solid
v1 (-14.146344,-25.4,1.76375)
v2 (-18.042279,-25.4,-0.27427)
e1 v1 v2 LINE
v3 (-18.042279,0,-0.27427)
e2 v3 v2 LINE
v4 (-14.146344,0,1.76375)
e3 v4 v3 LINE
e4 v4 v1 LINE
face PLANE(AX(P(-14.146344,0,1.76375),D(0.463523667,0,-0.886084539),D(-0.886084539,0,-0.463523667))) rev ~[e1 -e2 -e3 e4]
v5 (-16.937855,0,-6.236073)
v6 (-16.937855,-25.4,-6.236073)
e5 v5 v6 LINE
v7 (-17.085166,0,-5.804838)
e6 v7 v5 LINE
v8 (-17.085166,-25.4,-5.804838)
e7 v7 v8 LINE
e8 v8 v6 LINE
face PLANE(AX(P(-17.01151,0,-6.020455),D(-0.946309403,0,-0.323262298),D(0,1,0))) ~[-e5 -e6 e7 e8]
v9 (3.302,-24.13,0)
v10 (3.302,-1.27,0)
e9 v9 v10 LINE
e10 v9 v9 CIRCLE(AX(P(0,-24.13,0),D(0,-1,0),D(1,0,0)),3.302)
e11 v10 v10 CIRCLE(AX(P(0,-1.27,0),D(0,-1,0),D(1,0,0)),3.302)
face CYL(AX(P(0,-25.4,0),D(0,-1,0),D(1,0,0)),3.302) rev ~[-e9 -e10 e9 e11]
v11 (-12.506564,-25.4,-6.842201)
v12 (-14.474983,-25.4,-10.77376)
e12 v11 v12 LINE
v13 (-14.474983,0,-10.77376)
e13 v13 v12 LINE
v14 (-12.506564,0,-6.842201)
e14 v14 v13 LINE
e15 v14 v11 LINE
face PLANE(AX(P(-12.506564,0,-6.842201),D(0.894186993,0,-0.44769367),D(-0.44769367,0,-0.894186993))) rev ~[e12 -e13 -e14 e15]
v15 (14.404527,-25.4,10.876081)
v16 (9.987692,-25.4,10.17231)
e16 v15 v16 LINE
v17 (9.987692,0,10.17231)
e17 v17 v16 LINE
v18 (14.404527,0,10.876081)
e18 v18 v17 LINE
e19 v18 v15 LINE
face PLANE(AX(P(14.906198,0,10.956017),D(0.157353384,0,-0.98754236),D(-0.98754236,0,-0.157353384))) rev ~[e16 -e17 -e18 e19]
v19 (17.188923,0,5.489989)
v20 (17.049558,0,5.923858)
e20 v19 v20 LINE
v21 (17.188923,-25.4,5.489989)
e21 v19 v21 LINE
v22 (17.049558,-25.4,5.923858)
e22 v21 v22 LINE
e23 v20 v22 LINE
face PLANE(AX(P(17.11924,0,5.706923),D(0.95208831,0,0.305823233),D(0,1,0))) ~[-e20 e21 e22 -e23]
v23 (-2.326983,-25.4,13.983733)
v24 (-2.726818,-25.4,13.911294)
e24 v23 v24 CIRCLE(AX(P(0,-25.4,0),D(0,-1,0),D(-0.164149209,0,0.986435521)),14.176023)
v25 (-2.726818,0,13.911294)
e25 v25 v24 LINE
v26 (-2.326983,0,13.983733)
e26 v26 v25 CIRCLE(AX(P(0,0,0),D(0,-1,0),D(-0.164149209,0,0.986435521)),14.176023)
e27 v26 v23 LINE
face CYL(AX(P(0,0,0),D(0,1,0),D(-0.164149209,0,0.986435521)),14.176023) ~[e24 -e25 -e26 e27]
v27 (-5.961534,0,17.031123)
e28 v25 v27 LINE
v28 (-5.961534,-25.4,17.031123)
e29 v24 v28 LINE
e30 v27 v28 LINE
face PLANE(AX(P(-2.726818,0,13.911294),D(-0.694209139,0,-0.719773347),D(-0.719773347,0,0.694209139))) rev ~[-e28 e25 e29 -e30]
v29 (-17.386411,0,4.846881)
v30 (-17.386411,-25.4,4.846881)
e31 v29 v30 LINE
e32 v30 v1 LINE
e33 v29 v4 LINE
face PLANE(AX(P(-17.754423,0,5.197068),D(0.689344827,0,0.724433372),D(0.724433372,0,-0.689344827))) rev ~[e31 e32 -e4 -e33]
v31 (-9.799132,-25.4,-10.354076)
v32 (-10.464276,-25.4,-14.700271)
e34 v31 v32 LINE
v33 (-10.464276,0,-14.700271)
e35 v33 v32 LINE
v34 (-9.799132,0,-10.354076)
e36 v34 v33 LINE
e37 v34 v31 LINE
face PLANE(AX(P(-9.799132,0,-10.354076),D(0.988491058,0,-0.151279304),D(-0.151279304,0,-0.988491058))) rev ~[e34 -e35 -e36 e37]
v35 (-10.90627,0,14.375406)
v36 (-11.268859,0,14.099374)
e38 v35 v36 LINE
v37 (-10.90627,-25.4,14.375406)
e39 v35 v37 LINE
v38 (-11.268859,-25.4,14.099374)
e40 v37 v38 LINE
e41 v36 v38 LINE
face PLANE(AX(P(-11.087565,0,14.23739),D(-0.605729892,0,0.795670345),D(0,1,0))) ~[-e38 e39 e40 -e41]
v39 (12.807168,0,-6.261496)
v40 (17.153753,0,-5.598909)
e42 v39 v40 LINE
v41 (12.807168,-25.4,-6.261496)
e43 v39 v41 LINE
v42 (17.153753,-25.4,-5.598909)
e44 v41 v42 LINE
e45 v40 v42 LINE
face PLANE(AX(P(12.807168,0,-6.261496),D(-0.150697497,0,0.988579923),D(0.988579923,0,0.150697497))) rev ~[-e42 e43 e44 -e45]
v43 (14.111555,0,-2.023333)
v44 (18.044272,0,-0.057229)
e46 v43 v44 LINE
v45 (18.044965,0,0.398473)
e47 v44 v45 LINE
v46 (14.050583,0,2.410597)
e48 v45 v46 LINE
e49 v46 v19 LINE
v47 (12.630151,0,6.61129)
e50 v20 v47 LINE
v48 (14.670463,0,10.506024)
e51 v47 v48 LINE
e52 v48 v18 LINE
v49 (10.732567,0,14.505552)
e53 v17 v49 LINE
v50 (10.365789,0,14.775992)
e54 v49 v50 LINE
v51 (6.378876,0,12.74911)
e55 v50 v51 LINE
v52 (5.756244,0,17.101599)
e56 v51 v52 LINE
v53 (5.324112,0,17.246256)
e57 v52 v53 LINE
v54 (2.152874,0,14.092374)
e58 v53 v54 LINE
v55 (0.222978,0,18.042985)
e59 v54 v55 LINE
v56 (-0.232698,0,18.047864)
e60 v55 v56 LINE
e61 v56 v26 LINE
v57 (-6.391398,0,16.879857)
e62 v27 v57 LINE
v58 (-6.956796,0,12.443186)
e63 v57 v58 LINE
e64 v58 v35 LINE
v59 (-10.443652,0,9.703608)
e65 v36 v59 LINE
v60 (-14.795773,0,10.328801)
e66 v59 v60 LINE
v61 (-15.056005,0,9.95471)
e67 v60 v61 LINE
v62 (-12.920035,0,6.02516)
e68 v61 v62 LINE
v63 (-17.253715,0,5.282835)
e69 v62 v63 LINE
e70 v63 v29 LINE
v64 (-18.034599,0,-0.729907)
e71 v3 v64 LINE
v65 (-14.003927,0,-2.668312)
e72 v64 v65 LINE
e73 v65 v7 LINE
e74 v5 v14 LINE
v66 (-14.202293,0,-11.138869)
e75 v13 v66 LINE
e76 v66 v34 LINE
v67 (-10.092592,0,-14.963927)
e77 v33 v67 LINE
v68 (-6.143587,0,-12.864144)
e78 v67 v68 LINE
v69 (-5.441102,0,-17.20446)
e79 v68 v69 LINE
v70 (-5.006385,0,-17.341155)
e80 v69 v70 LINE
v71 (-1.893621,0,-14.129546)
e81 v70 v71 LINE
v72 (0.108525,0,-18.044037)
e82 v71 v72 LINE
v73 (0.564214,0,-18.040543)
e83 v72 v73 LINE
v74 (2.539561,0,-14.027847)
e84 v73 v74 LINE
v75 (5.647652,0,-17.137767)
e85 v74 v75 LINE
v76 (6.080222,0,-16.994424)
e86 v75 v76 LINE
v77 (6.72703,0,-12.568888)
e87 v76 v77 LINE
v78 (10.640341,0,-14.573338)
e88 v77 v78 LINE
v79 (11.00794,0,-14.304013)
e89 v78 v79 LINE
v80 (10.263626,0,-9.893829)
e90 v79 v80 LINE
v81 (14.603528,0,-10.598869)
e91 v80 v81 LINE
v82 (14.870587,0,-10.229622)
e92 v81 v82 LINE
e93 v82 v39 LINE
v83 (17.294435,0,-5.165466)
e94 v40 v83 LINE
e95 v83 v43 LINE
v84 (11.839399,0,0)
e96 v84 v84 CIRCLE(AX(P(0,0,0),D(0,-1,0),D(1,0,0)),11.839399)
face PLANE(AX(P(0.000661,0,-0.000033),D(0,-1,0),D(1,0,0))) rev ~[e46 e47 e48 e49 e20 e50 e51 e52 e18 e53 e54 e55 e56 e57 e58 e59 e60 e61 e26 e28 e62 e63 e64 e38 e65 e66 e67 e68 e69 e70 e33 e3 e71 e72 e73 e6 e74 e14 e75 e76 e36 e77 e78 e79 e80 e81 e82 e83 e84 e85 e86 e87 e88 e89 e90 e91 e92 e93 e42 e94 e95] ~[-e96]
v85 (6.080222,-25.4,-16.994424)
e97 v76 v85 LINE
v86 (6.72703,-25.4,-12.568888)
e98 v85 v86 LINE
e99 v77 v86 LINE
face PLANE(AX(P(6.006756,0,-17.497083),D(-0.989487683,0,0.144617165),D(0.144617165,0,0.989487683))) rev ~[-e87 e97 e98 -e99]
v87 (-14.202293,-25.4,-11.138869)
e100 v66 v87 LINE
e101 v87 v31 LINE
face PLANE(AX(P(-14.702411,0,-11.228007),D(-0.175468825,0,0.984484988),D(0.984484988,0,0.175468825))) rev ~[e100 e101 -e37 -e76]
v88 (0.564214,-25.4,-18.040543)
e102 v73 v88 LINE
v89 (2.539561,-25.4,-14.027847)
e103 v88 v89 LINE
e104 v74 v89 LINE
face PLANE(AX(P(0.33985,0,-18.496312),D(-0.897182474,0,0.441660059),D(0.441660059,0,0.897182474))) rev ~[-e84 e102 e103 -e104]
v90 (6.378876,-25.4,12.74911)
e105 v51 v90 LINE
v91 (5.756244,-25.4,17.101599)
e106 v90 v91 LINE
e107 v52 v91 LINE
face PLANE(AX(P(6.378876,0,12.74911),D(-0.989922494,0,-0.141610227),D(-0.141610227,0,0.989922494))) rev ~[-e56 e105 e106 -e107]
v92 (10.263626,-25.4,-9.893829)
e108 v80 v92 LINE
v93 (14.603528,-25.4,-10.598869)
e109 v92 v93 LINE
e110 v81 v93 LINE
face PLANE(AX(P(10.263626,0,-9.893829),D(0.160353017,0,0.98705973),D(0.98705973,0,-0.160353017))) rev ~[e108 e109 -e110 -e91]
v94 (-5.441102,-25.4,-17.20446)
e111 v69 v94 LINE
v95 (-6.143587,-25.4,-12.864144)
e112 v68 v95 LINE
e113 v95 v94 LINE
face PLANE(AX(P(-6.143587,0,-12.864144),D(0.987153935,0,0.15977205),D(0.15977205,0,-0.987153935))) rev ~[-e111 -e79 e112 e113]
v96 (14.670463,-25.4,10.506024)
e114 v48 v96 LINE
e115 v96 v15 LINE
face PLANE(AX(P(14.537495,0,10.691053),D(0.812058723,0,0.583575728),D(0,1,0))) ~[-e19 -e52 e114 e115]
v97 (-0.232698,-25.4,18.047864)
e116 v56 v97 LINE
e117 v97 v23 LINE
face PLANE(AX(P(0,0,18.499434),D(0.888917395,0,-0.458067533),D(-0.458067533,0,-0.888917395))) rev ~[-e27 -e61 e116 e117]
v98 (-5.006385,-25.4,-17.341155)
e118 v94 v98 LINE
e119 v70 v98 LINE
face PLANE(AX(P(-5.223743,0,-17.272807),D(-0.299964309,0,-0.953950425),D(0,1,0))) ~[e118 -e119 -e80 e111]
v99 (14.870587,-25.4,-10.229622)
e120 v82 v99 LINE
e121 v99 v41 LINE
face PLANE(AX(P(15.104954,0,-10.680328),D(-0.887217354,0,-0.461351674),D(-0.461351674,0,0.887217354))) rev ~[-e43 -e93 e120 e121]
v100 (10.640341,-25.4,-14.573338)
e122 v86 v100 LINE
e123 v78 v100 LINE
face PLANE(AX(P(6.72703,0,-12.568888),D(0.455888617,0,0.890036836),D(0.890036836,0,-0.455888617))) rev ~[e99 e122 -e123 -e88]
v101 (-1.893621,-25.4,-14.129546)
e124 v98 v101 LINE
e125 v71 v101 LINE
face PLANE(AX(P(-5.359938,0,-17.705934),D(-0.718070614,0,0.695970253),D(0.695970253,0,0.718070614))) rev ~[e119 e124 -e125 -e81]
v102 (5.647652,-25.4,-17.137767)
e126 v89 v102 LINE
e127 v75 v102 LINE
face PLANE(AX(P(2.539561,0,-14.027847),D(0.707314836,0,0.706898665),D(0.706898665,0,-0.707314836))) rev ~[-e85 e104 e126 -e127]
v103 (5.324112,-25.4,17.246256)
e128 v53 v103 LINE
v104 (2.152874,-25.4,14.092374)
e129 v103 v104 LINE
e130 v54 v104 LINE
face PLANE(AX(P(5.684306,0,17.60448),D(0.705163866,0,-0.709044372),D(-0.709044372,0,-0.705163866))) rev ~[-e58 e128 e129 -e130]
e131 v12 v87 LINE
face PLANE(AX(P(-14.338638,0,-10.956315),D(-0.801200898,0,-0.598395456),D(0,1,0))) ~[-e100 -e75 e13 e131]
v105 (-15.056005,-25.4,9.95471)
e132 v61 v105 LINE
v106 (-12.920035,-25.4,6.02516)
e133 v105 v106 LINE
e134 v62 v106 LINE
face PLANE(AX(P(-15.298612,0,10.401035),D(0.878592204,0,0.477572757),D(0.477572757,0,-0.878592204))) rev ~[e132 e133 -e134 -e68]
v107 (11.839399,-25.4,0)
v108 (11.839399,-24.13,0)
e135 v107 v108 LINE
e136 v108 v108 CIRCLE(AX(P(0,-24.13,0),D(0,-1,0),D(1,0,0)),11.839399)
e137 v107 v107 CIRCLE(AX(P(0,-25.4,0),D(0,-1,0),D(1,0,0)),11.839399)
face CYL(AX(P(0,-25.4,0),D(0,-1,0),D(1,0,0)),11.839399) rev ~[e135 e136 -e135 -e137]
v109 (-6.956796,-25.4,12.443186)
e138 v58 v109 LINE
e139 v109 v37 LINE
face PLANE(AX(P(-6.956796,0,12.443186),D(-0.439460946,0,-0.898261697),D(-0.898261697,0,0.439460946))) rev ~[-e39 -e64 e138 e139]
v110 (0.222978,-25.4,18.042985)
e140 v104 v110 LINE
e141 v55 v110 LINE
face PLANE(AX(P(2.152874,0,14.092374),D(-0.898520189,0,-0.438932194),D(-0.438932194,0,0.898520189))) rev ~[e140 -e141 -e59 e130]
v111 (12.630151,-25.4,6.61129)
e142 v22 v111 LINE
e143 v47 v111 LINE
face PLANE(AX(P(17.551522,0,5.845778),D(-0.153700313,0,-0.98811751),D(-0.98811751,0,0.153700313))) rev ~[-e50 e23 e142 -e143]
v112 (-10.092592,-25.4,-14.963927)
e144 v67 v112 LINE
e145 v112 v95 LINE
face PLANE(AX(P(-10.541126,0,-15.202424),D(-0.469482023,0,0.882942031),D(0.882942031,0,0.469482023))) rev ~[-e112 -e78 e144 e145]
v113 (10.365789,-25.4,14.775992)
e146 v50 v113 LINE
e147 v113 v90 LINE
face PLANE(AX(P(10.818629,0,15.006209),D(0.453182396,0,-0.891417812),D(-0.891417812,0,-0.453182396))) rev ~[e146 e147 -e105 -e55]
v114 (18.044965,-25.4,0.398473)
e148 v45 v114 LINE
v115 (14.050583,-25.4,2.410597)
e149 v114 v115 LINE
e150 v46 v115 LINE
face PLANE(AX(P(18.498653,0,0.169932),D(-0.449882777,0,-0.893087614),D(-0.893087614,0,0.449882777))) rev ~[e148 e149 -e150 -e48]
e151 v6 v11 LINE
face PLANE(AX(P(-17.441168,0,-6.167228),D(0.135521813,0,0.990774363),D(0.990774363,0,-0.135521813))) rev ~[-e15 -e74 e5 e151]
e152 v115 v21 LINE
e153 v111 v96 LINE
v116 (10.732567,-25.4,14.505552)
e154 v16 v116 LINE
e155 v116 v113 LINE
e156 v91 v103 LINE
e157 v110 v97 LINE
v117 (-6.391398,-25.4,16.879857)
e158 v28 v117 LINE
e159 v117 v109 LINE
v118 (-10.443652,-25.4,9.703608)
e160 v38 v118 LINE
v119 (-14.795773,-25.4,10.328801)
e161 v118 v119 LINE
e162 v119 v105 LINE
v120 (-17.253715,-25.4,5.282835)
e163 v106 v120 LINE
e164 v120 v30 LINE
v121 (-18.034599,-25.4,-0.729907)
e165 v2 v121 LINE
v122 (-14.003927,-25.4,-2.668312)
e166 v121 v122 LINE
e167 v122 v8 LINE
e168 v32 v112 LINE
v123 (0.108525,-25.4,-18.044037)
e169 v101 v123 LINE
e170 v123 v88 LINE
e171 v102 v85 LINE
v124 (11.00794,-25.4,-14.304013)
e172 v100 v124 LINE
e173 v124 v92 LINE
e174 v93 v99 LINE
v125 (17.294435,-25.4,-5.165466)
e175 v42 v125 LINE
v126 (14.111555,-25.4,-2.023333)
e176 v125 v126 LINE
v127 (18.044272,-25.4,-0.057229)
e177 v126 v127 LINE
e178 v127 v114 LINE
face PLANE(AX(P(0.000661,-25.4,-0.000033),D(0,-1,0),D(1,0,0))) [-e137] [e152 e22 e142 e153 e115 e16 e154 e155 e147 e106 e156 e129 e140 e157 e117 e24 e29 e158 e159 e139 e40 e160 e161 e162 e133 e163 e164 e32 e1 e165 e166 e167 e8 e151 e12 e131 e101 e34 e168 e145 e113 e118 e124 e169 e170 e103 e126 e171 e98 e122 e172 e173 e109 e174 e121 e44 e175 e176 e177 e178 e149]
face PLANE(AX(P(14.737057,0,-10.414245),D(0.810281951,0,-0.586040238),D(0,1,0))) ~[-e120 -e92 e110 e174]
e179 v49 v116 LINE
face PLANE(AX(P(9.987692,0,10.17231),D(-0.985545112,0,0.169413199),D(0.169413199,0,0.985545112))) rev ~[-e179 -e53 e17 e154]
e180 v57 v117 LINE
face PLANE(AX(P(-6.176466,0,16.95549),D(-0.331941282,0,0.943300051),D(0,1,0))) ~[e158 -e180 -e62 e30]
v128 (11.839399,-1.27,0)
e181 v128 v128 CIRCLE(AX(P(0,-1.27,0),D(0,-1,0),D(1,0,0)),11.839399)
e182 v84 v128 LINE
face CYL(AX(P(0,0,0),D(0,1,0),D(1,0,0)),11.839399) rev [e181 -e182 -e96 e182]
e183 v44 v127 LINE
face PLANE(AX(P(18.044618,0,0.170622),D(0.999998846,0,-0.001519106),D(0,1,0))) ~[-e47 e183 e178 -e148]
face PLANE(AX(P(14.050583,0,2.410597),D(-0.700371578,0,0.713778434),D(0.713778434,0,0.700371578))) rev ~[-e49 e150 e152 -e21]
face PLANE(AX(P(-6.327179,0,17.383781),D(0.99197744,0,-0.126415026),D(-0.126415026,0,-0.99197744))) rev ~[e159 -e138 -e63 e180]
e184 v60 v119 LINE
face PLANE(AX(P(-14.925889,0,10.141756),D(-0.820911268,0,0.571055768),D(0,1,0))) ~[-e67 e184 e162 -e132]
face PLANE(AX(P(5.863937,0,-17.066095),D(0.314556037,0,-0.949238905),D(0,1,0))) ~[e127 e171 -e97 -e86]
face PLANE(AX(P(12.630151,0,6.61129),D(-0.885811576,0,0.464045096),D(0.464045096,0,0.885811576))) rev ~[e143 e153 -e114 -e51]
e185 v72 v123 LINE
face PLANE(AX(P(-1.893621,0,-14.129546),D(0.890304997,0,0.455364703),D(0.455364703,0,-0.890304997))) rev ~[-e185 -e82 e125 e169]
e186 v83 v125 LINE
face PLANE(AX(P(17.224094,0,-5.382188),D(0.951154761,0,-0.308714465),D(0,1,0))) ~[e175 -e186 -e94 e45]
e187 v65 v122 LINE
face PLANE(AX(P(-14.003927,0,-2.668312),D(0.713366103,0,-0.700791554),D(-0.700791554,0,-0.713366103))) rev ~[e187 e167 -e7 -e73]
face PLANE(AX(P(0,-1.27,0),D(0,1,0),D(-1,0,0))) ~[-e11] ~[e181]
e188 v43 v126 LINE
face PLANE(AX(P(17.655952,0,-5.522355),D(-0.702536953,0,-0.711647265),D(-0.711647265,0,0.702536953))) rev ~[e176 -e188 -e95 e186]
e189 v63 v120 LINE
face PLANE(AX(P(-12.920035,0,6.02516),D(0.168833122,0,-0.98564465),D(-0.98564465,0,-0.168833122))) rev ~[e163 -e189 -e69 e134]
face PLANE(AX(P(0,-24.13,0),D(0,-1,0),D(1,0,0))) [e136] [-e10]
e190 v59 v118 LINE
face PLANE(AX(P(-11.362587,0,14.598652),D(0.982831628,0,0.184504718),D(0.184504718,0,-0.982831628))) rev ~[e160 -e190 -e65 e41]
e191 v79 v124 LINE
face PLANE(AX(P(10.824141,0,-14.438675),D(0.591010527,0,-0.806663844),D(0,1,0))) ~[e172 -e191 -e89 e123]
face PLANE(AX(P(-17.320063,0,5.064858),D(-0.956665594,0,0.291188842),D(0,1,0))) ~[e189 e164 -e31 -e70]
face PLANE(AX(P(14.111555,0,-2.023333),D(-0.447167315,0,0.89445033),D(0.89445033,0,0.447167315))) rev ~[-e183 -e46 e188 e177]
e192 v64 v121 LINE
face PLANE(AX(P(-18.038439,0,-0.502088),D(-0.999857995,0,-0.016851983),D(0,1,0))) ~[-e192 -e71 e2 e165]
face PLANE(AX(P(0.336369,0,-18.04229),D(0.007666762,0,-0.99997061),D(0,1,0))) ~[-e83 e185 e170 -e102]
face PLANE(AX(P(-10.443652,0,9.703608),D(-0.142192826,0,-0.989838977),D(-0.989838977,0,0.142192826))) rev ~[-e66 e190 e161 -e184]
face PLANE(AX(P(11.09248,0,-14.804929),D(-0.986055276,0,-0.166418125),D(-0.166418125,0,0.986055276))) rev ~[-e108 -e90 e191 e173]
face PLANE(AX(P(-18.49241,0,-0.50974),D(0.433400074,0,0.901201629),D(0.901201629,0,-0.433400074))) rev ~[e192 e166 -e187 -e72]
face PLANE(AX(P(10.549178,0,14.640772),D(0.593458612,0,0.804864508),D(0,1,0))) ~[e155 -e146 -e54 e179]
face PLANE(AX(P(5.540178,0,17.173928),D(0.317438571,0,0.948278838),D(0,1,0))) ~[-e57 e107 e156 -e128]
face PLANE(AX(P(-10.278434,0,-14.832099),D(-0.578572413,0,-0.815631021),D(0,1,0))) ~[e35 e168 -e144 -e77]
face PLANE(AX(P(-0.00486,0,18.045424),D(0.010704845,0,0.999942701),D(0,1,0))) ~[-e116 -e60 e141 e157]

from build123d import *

# Parameters (mm, degrees)
F1_DEPTH = 25.4
F2_SIZE  = 0.508
F3_R     = 3.302
F4_DEPTH = 25.401
F5_R     = 11.8393994815
F6_DEPTH = 1.27


# Not quite as in the source:
# - a pattern or mirror of a feature is missing from the dataset's text; its kind, count and spacing are read off the source's solid


with BuildPart() as f1:
    # F0 (on Front) → F1 (new body)
    with BuildSketch(Plane.XZ):
        with BuildLine():
            ThreePointArc((2.1955722256, 14.0049672679), (2.1389839725, 14.013721602), (2.0823608197, 14.0222472874))
            ThreePointArc((2.0823608197, 14.0222472874), (-0.1238177863, 14.1754828746), (-2.3269830694, 13.9837332414))
            ThreePointArc((-2.3269830694, 13.9837332414), (-2.5271600448, 13.9489464721), (-2.7268178935, 13.9112943233))
            ThreePointArc((-2.7268178935, 13.9112943233), (-4.8572204087, 13.3179223407), (-6.8694139522, 12.4004353764))
            ThreePointArc((-6.8694139522, 12.4004353764), (-6.9194470584, 12.3725865517), (-6.9693672664, 12.3445358551))
            ThreePointArc((-6.9693672664, 12.3445358551), (-8.7595213047, 11.1458706293), (-10.3473616978, 9.6897756149))
            ThreePointArc((-10.3473616978, 9.6897756149), (-10.3864172478, 9.6479004103), (-10.4253033325, 9.60586779))
            ThreePointArc((-10.4253033325, 9.60586779), (-11.7605415234, 7.9151316255), (-12.8241532244, 6.0415842004))
            ThreePointArc((-12.8241532244, 6.0415842004), (-12.8484524089, 5.9897342401), (-12.8725419575, 5.937786551))
            ThreePointArc((-12.8725419575, 5.937786551), (-13.6236736863, 3.9185661741), (-14.060147229, 1.8088409193))
            ThreePointArc((-14.060147229, 1.8088409193), (-14.067338987, 1.7520329324), (-14.0743012216, 1.6951963594))
            ThreePointArc((-14.0743012216, 1.6951963594), (-14.1686509384, -0.4571391014), (-13.9357554417, -2.5989162821))
            ThreePointArc((-13.9357554417, -2.5989162821), (-13.9251439365, -2.6551858539), (-13.914305228, -2.7114121035))
            ThreePointArc((-13.914305228, -2.7114121035), (-13.3427441511, -4.7886140051), (-12.4630133566, -6.7552160324))
            ThreePointArc((-12.4630133566, -6.7552160324), (-12.4356253016, -6.8055028418), (-12.4080343463, -6.8556786122))
            ThreePointArc((-12.4080343463, -6.8556786122), (-11.2258637152, -8.6567678391), (-9.7844157411, -10.2579166587))
            ThreePointArc((-9.7844157411, -10.2579166587), (-9.7429010602, -10.2973552188), (-9.7012274137, -10.3366257667))
            ThreePointArc((-9.7012274137, -10.3366257667), (-8.0228278321, -11.6873384117), (-6.1591295924, -12.768115297))
            ThreePointArc((-6.1591295924, -12.768115297), (-6.1075050275, -12.7928897404), (-6.0557808122, -12.8174554544))
            ThreePointArc((-6.0557808122, -12.8174554544), (-4.0435453838, -13.587103676), (-1.9379185041, -14.0429383479))
            ThreePointArc((-1.9379185041, -14.0429383479), (-1.8811789762, -14.0506516302), (-1.8244087549, -14.0581356612))
            ThreePointArc((-1.8244087549, -14.0581356612), (0.3269692188, -14.1722523511), (2.4707953718, -13.9590406477))
            ThreePointArc((2.4707953718, -13.9590406477), (2.5271600448, -13.9489464721), (2.5834834846, -13.9386247047))
            ThreePointArc((2.5834834846, -13.9386247047), (4.6658480019, -13.3861685331), (6.640448101, -12.5245396958))
            ThreePointArc((6.640448101, -12.5245396958), (6.6909843703, -12.4976147216), (6.7414114691, -12.4704858356))
            ThreePointArc((6.7414114691, -12.4704858356), (8.5532839071, -11.3049095519), (10.1676060468, -9.8782302489))
            ThreePointArc((10.1676060468, -9.8782302489), (10.2074242891, -9.8370795948), (10.2470759865, -9.7957684384))
            ThreePointArc((10.2470759865, -9.7957684384), (11.613149111, -8.1298470648), (12.7109999837, -6.2761552711))
            ThreePointArc((12.7109999837, -6.2761552711), (12.7362475956, -6.2247604577), (12.7612874022, -6.1732640808))
            ThreePointArc((12.7612874022, -6.1732640808), (13.5493871727, -4.1681833951), (14.0245445102, -2.0668325655))
            ThreePointArc((14.0245445102, -2.0668325655), (14.0327786658, -2.0101662842), (14.0407838617, -1.953467205))
            ThreePointArc((14.0407838617, -1.953467205), (14.1421732628, -0.9790714877), (14.1760236164, 0))
            ThreePointArc((14.1760236164, 0), (14.127220701, 1.1752790468), (13.9811479763, 2.3424659733))
            ThreePointArc((13.9811479763, 2.3424659733), (13.971571982, 2.3989209915), (13.9617680268, 2.4553368688))
            ThreePointArc((13.9617680268, 2.4553368688), (13.4284633772, 4.54268829), (12.5850092021, 6.5251198421))
            ThreePointArc((12.5850092021, 6.5251198421), (12.5585495807, 6.5759013071), (12.5318850533, 6.6265754793))
            ThreePointArc((12.5318850533, 6.6265754793), (11.3830014695, 8.4490782407), (9.971211222, 10.0764374825))
            ThreePointArc((9.971211222, 10.0764374825), (9.9304280671, 10.1166320471), (9.8894828868, 10.1566615482))
            ThreePointArc((9.8894828868, 10.1566615482), (8.2361802932, 11.5379798817), (6.3926513618, 12.652812104))
            ThreePointArc((6.3926513618, 12.652812104), (6.3414906367, 12.6785307539), (6.2902264434, 12.7040425402))
            ThreePointArc((6.2902264434, 12.7040425402), (4.2924696912, 13.5105273592), (2.1955722256, 14.0049672679))
        make_face()
        with BuildLine():
            Line((2.1528735086, 14.0923740697), (2.0823608197, 14.0222472874))
            ThreePointArc((2.0823608197, 14.0222472874), (2.1389839725, 14.013721602), (2.1955722256, 14.0049672679))
            Line((2.1955722256, 14.0049672679), (2.1528735086, 14.0923740697))
        make_face()
        with BuildLine():
            ThreePointArc((-2.3269830694, 13.9837332414), (-0.1238177863, 14.1754828746), (2.0823608197, 14.0222472874))
            Line((2.0823608197, 14.0222472874), (2.1528735086, 14.0923740697))
            Line((2.1528735086, 14.0923740697), (0, 18.4994336074))
            Line((0, 18.4994336074), (-2.3269830694, 13.9837332414))
        make_face()
        with BuildLine():
            Line((2.1528735086, 14.0923740697), (2.1955722256, 14.0049672679))
            ThreePointArc((2.1955722256, 14.0049672679), (4.2924696912, 13.5105273592), (6.2902264434, 12.7040425402))
            Line((6.2902264434, 12.7040425402), (6.3788757147, 12.7491103956))
            Line((6.3788757147, 12.7491103956), (5.6843062312, 17.6044797271))
            Line((5.6843062312, 17.6044797271), (2.1528735086, 14.0923740697))
        make_face()
        with BuildLine():
            ThreePointArc((-6.8694139522, 12.4004353764), (-4.8572204087, 13.3179223407), (-2.7268178935, 13.9112943233))
            Line((-2.7268178935, 13.9112943233), (-6.3271789338, 17.3837812496))
            Line((-6.3271789338, 17.3837812496), (-6.9567956084, 12.4431855297))
            Line((-6.9567956084, 12.4431855297), (-6.8694139522, 12.4004353764))
        make_face()
        with BuildLine():
            Line((6.3788757147, 12.7491103956), (6.2902264434, 12.7040425402))
            ThreePointArc((6.2902264434, 12.7040425402), (6.3414906367, 12.6785307539), (6.3926513618, 12.652812104))
            Line((6.3926513618, 12.652812104), (6.3788757147, 12.7491103956))
        make_face()
        with BuildLine():
            ThreePointArc((-6.9693672664, 12.3445358551), (-6.9194470584, 12.3725865517), (-6.8694139522, 12.4004353764))
            Line((-6.8694139522, 12.4004353764), (-6.9567956084, 12.4431855297))
            Line((-6.9567956084, 12.4431855297), (-6.9693672664, 12.3445358551))
        make_face()
        with BuildLine():
            Line((6.3788757147, 12.7491103956), (6.3926513618, 12.652812104))
            ThreePointArc((6.3926513618, 12.652812104), (8.2361802932, 11.5379798817), (9.8894828868, 10.1566615482))
            Line((9.8894828868, 10.1566615482), (9.9876915038, 10.1723099485))
            Line((9.9876915038, 10.1723099485), (10.8186289304, 15.0062091102))
            Line((10.8186289304, 15.0062091102), (6.3788757147, 12.7491103956))
        make_face()
        with BuildLine():
            ThreePointArc((-10.3473616978, 9.6897756149), (-8.7595213047, 11.1458706293), (-6.9693672664, 12.3445358551))
            Line((-6.9693672664, 12.3445358551), (-6.9567956084, 12.4431855297))
            Line((-6.9567956084, 12.4431855297), (-11.3625872992, 14.5986524605))
            Line((-11.3625872992, 14.5986524605), (-10.443651865, 9.7036079365))
            Line((-10.443651865, 9.7036079365), (-10.3473616978, 9.6897756149))
        make_face()
        with BuildLine():
            Line((9.9876915038, 10.1723099485), (9.8894828868, 10.1566615482))
            ThreePointArc((9.8894828868, 10.1566615482), (9.9304280671, 10.1166320471), (9.971211222, 10.0764374825))
            Line((9.971211222, 10.0764374825), (9.9876915038, 10.1723099485))
        make_face()
        with BuildLine():
            ThreePointArc((-10.4253033325, 9.60586779), (-10.3864172478, 9.6479004103), (-10.3473616978, 9.6897756149))
            Line((-10.3473616978, 9.6897756149), (-10.443651865, 9.7036079365))
            Line((-10.443651865, 9.7036079365), (-10.4253033325, 9.60586779))
        make_face()
        with BuildLine():
            Line((9.9876915038, 10.1723099485), (9.971211222, 10.0764374825))
            ThreePointArc((9.971211222, 10.0764374825), (11.3830014695, 8.4490782407), (12.5318850533, 6.6265754793))
            Line((12.5318850533, 6.6265754793), (12.6301508676, 6.6112903677))
            Line((12.6301508676, 6.6112903677), (14.9061980753, 10.9560167366))
            Line((14.9061980753, 10.9560167366), (9.9876915038, 10.1723099485))
        make_face()
        with BuildLine():
            ThreePointArc((-12.8241532244, 6.0415842004), (-11.7605415234, 7.9151316255), (-10.4253033325, 9.60586779))
            Line((-10.4253033325, 9.60586779), (-10.443651865, 9.7036079365))
            Line((-10.443651865, 9.7036079365), (-15.2986115636, 10.4010349495))
            Line((-15.2986115636, 10.4010349495), (-12.9200353733, 6.0251603477))
            Line((-12.9200353733, 6.0251603477), (-12.8241532244, 6.0415842004))
        make_face()
        with BuildLine():
            Line((12.6301508676, 6.6112903677), (12.5318850533, 6.6265754793))
            ThreePointArc((12.5318850533, 6.6265754793), (12.5585495807, 6.5759013071), (12.5850092021, 6.5251198421))
            Line((12.5850092021, 6.5251198421), (12.6301508676, 6.6112903677))
        make_face()
        with BuildLine():
            ThreePointArc((-12.8725419575, 5.937786551), (-12.8484524089, 5.9897342401), (-12.8241532244, 6.0415842004))
            Line((-12.8241532244, 6.0415842004), (-12.9200353733, 6.0251603477))
            Line((-12.9200353733, 6.0251603477), (-12.8725419575, 5.937786551))
        make_face()
        with BuildLine():
            Line((12.6301508676, 6.6112903677), (12.5850092021, 6.5251198421))
            ThreePointArc((12.5850092021, 6.5251198421), (13.4284633772, 4.54268829), (13.9617680268, 2.4553368688))
            Line((13.9617680268, 2.4553368688), (14.0505833556, 2.4105971522))
            Line((14.0505833556, 2.4105971522), (17.5515220045, 5.8457778882))
            Line((17.5515220045, 5.8457778882), (12.6301508676, 6.6112903677))
        make_face()
        with BuildLine():
            ThreePointArc((-14.060147229, 1.8088409193), (-13.6236736863, 3.9185661741), (-12.8725419575, 5.937786551))
            Line((-12.8725419575, 5.937786551), (-12.9200353733, 6.0251603477))
            Line((-12.9200353733, 6.0251603477), (-17.7544227499, 5.1970680784))
            Line((-17.7544227499, 5.1970680784), (-14.146344308, 1.7637499777))
            Line((-14.146344308, 1.7637499777), (-14.060147229, 1.8088409193))
        make_face()
        with BuildLine():
            Line((14.0505833556, 2.4105971522), (13.9617680268, 2.4553368688))
            ThreePointArc((13.9617680268, 2.4553368688), (13.971571982, 2.3989209915), (13.9811479763, 2.3424659733))
            Line((13.9811479763, 2.3424659733), (14.0505833556, 2.4105971522))
        make_face()
        with BuildLine():
            ThreePointArc((-14.0743012216, 1.6951963594), (-14.067338987, 1.7520329324), (-14.060147229, 1.8088409193))
            Line((-14.060147229, 1.8088409193), (-14.146344308, 1.7637499777))
            Line((-14.146344308, 1.7637499777), (-14.0743012216, 1.6951963594))
        make_face()
        with BuildLine():
            Line((14.0505833556, 2.4105971522), (13.9811479763, 2.3424659733))
            ThreePointArc((13.9811479763, 2.3424659733), (14.127220701, 1.1752790468), (14.1760236164, 0))
            ThreePointArc((14.1760236164, 0), (14.1421732628, -0.9790714877), (14.0407838617, -1.953467205))
            Line((14.0407838617, -1.953467205), (14.1115554018, -2.0233327473))
            Line((14.1115554018, -2.0233327473), (18.4986531073, 0.1699323607))
            Line((18.4986531073, 0.1699323607), (14.0505833556, 2.4105971522))
        make_face()
        with BuildLine():
            ThreePointArc((-13.9357554417, -2.5989162821), (-14.1686509384, -0.4571391014), (-14.0743012216, 1.6951963594))
            Line((-14.0743012216, 1.6951963594), (-14.146344308, 1.7637499777))
            Line((-14.146344308, 1.7637499777), (-18.4924095024, -0.5097397272))
            Line((-18.4924095024, -0.5097397272), (-14.0039274753, -2.6683115505))
            Line((-14.0039274753, -2.6683115505), (-13.9357554417, -2.5989162821))
        make_face()
        with BuildLine():
            ThreePointArc((-13.914305228, -2.7114121035), (-13.9251439365, -2.6551858539), (-13.9357554417, -2.5989162821))
            Line((-13.9357554417, -2.5989162821), (-14.0039274753, -2.6683115505))
            Line((-14.0039274753, -2.6683115505), (-13.914305228, -2.7114121035))
        make_face()
        with BuildLine():
            Line((14.1115554018, -2.0233327473), (14.0407838617, -1.953467205))
            ThreePointArc((14.0407838617, -1.953467205), (14.0327786658, -2.0101662842), (14.0245445102, -2.0668325655))
            Line((14.0245445102, -2.0668325655), (14.1115554018, -2.0233327473))
        make_face()
        with BuildLine():
            Line((17.6559519668, -5.5223549269), (14.1115554018, -2.0233327473))
            Line((14.1115554018, -2.0233327473), (14.0245445102, -2.0668325655))
            ThreePointArc((14.0245445102, -2.0668325655), (13.5493871727, -4.1681833951), (12.7612874022, -6.1732640808))
            Line((12.7612874022, -6.1732640808), (12.8071676719, -6.261495627))
            Line((12.8071676719, -6.261495627), (17.6559519668, -5.5223549269))
        make_face()
        with BuildLine():
            ThreePointArc((-12.4630133566, -6.7552160324), (-13.3427441511, -4.7886140051), (-13.914305228, -2.7114121035))
            Line((-13.914305228, -2.7114121035), (-14.0039274753, -2.6683115505))
            Line((-14.0039274753, -2.6683115505), (-17.4411681098, -6.1672278017))
            Line((-17.4411681098, -6.1672278017), (-12.5065643779, -6.8422013069))
            Line((-12.5065643779, -6.8422013069), (-12.4630133566, -6.7552160324))
        make_face()
        with BuildLine():
            ThreePointArc((-12.4080343463, -6.8556786122), (-12.4356253016, -6.8055028418), (-12.4630133566, -6.7552160324))
            Line((-12.4630133566, -6.7552160324), (-12.5065643779, -6.8422013069))
            Line((-12.5065643779, -6.8422013069), (-12.4080343463, -6.8556786122))
        make_face()
        with BuildLine():
            Line((12.8071676719, -6.261495627), (12.7612874022, -6.1732640808))
            ThreePointArc((12.7612874022, -6.1732640808), (12.7362475956, -6.2247604577), (12.7109999837, -6.2761552711))
            Line((12.7109999837, -6.2761552711), (12.8071676719, -6.261495627))
        make_face()
        with BuildLine():
            Line((15.1049539068, -10.6803282378), (12.8071676719, -6.261495627))
            Line((12.8071676719, -6.261495627), (12.7109999837, -6.2761552711))
            ThreePointArc((12.7109999837, -6.2761552711), (11.613149111, -8.1298470648), (10.2470759865, -9.7957684384))
            Line((10.2470759865, -9.7957684384), (10.2636258527, -9.8938291687))
            Line((10.2636258527, -9.8938291687), (15.1049539068, -10.6803282378))
        make_face()
        with BuildLine():
            ThreePointArc((-9.7844157411, -10.2579166587), (-11.2258637152, -8.6567678391), (-12.4080343463, -6.8556786122))
            Line((-12.4080343463, -6.8556786122), (-12.5065643779, -6.8422013069))
            Line((-12.5065643779, -6.8422013069), (-14.7024111525, -11.2280073964))
            Line((-14.7024111525, -11.2280073964), (-9.7991319827, -10.3540757023))
            Line((-9.7991319827, -10.3540757023), (-9.7844157411, -10.2579166587))
        make_face()
        with BuildLine():
            ThreePointArc((-9.7012274137, -10.3366257667), (-9.7429010602, -10.2973552188), (-9.7844157411, -10.2579166587))
            Line((-9.7844157411, -10.2579166587), (-9.7991319827, -10.3540757023))
            Line((-9.7991319827, -10.3540757023), (-9.7012274137, -10.3366257667))
        make_face()
        with BuildLine():
            Line((10.2636258527, -9.8938291687), (10.2470759865, -9.7957684384))
            ThreePointArc((10.2470759865, -9.7957684384), (10.2074242891, -9.8370795948), (10.1676060468, -9.8782302489))
            Line((10.1676060468, -9.8782302489), (10.2636258527, -9.8938291687))
        make_face()
        with BuildLine():
            Line((11.0924800636, -14.804929241), (10.2636258527, -9.8938291687))
            Line((10.2636258527, -9.8938291687), (10.1676060468, -9.8782302489))
            ThreePointArc((10.1676060468, -9.8782302489), (8.5532839071, -11.3049095519), (6.7414114691, -12.4704858356))
            Line((6.7414114691, -12.4704858356), (6.7270296539, -12.5688879102))
            Line((6.7270296539, -12.5688879102), (11.0924800636, -14.804929241))
        make_face()
        with BuildLine():
            ThreePointArc((-6.1591295924, -12.768115297), (-8.0228278321, -11.6873384117), (-9.7012274137, -10.3366257667))
            Line((-9.7012274137, -10.3366257667), (-9.7991319827, -10.3540757023))
            Line((-9.7991319827, -10.3540757023), (-10.5411263289, -15.2024241328))
            Line((-10.5411263289, -15.2024241328), (-6.1435871882, -12.8641442671))
            Line((-6.1435871882, -12.8641442671), (-6.1591295924, -12.768115297))
        make_face()
        with BuildLine():
            ThreePointArc((-6.0557808122, -12.8174554544), (-6.1075050275, -12.7928897404), (-6.1591295924, -12.768115297))
            Line((-6.1591295924, -12.768115297), (-6.1435871882, -12.8641442671))
            Line((-6.1435871882, -12.8641442671), (-6.0557808122, -12.8174554544))
        make_face()
        with BuildLine():
            Line((6.7270296539, -12.5688879102), (6.7414114691, -12.4704858356))
            ThreePointArc((6.7414114691, -12.4704858356), (6.6909843703, -12.4976147216), (6.640448101, -12.5245396958))
            Line((6.640448101, -12.5245396958), (6.7270296539, -12.5688879102))
        make_face()
        with BuildLine():
            Line((6.0067562729, -17.4970832675), (6.7270296539, -12.5688879102))
            Line((6.7270296539, -12.5688879102), (6.640448101, -12.5245396958))
            ThreePointArc((6.640448101, -12.5245396958), (4.6658480019, -13.3861685331), (2.5834834846, -13.9386247047))
            Line((2.5834834846, -13.9386247047), (2.5395614967, -14.0278472571))
            Line((2.5395614967, -14.0278472571), (6.0067562729, -17.4970832675))
        make_face()
        with BuildLine():
            ThreePointArc((-1.9379185041, -14.0429383479), (-4.0435453838, -13.587103676), (-6.0557808122, -12.8174554544))
            Line((-6.0557808122, -12.8174554544), (-6.1435871882, -12.8641442671))
            Line((-6.1435871882, -12.8641442671), (-5.359937641, -17.7059343802))
            Line((-5.359937641, -17.7059343802), (-1.8936212553, -14.1295459872))
            Line((-1.8936212553, -14.1295459872), (-1.9379185041, -14.0429383479))
        make_face()
        with BuildLine():
            ThreePointArc((-1.8244087549, -14.0581356612), (-1.8811789762, -14.0506516302), (-1.9379185041, -14.0429383479))
            Line((-1.9379185041, -14.0429383479), (-1.8936212553, -14.1295459872))
            Line((-1.8936212553, -14.1295459872), (-1.8244087549, -14.0581356612))
        make_face()
        with BuildLine():
            Line((2.5395614967, -14.0278472571), (2.5834834846, -13.9386247047))
            ThreePointArc((2.5834834846, -13.9386247047), (2.5271600448, -13.9489464721), (2.4707953718, -13.9590406477))
            Line((2.4707953718, -13.9590406477), (2.5395614967, -14.0278472571))
        make_face()
        with BuildLine():
            Line((0.3398503824, -18.4963116732), (2.5395614967, -14.0278472571))
            Line((2.5395614967, -14.0278472571), (2.4707953718, -13.9590406477))
            ThreePointArc((2.4707953718, -13.9590406477), (0.3269692188, -14.1722523511), (-1.8244087549, -14.0581356612))
            Line((-1.8244087549, -14.0581356612), (-1.8936212553, -14.1295459872))
            Line((-1.8936212553, -14.1295459872), (0.3398503824, -18.4963116732))
        make_face()
    extrude(amount=F1_DEPTH)

    # F2
    f2_edges = [f1.edges().sort_by_distance(p)[0] for p in [
        (0, -12.7, 18.499434),
        (5.684306, -12.7, 17.60448),
        (10.818629, -12.7, 15.006209),
        (14.906198, -12.7, 10.956017),
        (17.551522, -12.7, 5.845778),
        (18.498653, -12.7, 0.169932),
        (17.655952, -12.7, -5.522355),
        (15.104954, -12.7, -10.680328),
        (11.09248, -12.7, -14.804929),
        (6.006756, -12.7, -17.497083),
        (0.33985, -12.7, -18.496312),
        (-5.359938, -12.7, -17.705934),
        (-10.541126, -12.7, -15.202424),
        (-14.702411, -12.7, -11.228007),
        (-17.441168, -12.7, -6.167228),
        (-18.49241, -12.7, -0.50974),
        (-17.754423, -12.7, 5.197068),
        (-15.298612, -12.7, 10.401035),
        (-11.362587, -12.7, 14.598652),
        (-6.327179, -12.7, 17.383781),
    ]]
    chamfer(f2_edges, length=F2_SIZE)

    # F3 (on face) → F4 (cut, through all)
    with BuildSketch(Plane.XZ.offset(25.4)):
        Circle(F3_R)
    extrude(amount=-F4_DEPTH, mode=Mode.SUBTRACT)

    # F5 (on face) → F6 (cut)
    with BuildSketch(Plane.XZ.offset(25.4)):
        Circle(F5_R)
    f6 = extrude(amount=-F6_DEPTH, mode=Mode.SUBTRACT)

    # F6_copies: F6 across plane
    add(f6.mirror(Plane.ZX.offset(-12.7)), mode=Mode.SUBTRACT)


solid = f1.part
